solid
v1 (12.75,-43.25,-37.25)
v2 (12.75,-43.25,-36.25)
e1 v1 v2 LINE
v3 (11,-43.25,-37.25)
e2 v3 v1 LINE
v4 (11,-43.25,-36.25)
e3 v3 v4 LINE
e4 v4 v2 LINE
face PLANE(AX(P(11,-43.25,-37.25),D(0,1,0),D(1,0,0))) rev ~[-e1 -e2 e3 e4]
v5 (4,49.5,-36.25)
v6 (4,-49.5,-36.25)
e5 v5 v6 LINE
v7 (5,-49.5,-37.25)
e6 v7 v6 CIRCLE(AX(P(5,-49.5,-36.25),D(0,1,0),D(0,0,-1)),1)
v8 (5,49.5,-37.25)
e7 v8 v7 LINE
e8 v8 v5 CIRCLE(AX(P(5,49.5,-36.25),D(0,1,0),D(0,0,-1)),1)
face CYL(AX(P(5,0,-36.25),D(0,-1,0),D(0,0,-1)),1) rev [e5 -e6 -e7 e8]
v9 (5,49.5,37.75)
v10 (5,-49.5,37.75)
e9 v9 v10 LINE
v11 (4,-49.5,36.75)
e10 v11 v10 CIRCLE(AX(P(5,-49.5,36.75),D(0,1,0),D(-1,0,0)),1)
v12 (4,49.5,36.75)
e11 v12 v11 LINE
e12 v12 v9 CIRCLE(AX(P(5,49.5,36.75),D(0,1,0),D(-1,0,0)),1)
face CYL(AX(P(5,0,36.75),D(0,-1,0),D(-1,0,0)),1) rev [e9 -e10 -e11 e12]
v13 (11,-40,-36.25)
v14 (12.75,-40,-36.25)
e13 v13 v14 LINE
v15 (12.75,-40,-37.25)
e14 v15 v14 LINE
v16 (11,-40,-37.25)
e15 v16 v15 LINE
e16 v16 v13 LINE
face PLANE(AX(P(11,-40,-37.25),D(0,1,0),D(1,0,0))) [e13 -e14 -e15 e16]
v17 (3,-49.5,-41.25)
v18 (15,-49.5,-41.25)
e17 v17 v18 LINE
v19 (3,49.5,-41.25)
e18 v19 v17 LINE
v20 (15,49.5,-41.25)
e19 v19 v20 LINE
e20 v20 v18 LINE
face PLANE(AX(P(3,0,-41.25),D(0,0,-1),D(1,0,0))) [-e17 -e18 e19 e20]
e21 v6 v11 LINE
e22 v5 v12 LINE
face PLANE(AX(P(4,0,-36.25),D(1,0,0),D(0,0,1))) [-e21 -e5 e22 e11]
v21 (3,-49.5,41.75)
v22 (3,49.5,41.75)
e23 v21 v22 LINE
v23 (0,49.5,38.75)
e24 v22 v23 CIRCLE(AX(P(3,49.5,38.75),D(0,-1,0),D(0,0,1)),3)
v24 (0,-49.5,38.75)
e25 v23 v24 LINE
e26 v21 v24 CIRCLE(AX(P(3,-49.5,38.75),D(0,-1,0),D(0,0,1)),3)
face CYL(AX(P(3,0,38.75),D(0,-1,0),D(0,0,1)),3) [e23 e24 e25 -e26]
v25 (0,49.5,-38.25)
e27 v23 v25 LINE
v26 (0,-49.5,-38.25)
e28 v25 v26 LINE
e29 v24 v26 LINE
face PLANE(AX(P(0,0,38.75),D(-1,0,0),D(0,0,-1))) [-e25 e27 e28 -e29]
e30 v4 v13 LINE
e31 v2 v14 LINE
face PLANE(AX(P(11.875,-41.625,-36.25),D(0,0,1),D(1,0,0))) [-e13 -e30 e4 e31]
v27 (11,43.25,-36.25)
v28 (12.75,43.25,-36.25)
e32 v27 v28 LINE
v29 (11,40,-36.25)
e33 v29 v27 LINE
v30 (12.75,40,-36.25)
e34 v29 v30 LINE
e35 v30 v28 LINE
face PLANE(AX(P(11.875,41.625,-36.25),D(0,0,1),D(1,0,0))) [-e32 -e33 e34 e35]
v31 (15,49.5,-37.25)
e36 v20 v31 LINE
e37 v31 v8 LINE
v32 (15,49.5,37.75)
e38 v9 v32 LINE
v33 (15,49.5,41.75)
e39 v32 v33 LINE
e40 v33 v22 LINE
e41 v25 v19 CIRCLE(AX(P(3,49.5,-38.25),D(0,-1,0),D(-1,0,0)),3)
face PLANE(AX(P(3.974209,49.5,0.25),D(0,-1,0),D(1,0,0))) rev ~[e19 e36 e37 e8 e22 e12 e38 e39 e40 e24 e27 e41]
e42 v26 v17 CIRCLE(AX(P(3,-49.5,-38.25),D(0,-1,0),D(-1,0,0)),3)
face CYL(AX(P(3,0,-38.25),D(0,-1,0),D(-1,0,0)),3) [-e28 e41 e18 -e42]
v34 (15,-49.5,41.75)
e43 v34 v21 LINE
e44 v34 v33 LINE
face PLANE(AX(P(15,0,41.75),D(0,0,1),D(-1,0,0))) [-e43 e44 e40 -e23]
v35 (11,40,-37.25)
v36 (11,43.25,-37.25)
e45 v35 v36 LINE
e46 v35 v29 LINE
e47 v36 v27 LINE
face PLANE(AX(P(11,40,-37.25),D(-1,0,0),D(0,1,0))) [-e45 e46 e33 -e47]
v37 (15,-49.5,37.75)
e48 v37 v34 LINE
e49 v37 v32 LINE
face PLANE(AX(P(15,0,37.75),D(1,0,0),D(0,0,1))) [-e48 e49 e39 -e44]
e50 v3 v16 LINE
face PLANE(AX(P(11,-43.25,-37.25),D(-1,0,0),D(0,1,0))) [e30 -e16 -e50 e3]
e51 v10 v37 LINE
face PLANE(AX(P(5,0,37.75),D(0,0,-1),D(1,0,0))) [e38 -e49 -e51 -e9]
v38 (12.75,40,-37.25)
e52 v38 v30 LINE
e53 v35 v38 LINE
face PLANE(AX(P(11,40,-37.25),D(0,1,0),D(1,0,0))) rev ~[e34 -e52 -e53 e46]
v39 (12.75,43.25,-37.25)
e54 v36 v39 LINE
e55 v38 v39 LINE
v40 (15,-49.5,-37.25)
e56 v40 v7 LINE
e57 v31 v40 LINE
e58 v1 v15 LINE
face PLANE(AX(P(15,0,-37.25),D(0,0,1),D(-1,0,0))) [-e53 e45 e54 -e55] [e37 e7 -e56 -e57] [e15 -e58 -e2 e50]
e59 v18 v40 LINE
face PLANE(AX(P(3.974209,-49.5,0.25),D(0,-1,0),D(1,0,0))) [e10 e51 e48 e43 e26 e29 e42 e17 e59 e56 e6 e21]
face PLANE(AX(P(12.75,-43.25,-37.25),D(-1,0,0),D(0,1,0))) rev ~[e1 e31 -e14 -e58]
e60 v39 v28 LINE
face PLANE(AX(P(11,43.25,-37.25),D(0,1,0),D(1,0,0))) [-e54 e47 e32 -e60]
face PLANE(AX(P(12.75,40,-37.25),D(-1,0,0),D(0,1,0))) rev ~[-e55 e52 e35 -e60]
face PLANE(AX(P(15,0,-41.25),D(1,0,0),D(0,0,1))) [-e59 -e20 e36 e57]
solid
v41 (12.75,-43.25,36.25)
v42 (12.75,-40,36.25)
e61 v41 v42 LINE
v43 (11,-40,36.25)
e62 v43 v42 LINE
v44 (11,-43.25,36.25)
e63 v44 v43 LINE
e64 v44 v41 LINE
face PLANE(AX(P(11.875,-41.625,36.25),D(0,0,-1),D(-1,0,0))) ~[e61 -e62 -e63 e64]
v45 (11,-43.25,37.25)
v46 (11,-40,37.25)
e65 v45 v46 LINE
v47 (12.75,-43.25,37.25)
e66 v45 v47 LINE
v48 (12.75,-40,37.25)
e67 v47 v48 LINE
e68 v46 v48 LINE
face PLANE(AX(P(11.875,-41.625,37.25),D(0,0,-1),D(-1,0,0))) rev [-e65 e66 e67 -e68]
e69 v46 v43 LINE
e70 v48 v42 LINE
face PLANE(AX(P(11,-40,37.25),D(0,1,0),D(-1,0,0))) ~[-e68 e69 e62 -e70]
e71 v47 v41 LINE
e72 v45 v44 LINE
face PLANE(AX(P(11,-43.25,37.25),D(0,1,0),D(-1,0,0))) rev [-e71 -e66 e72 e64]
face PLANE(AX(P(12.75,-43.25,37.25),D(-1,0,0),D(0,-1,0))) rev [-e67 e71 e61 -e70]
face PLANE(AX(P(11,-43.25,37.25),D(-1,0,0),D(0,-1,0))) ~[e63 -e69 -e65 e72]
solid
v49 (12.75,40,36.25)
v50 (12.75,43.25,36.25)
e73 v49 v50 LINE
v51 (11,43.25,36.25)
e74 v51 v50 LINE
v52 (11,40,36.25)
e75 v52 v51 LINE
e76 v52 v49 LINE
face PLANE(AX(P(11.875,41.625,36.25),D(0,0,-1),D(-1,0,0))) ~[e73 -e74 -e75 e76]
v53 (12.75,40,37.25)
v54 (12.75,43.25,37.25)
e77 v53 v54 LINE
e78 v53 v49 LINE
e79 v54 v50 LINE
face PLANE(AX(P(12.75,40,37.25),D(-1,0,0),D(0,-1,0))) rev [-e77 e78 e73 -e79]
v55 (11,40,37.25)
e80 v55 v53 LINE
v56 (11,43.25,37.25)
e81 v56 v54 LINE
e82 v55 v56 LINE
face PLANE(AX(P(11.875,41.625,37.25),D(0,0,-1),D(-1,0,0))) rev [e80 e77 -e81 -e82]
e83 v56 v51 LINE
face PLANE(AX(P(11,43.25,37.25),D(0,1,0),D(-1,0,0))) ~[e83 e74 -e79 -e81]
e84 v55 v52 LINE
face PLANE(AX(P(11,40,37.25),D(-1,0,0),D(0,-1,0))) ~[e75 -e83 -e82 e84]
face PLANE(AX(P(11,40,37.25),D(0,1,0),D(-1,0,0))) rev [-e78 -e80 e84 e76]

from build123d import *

# Parameters (mm, degrees)
F1_DEPTH      = 49.5
F1_DEPTH_BACK = 49.5
F2_W          = 1.75
F2_H          = 3.25
F3_DEPTH      = 1


# Not quite as in the source:
# - a pattern or mirror of a feature is missing from the dataset's text; its kind, count and spacing are read off the source's solid


with BuildPart() as f1:
    # F0 (on Front) → F1 (new body, two sides)
    with BuildSketch(Plane.XZ) as f1_sk:
        with BuildLine():
            ThreePointArc((3, 41.75), (0.8786796564, 40.8713203436), (0, 38.75))
            Line((0, 38.75), (0, -38.25))
            ThreePointArc((0, -38.25), (0.8786796564, -40.3713203436), (3, -41.25))
            Line((3, -41.25), (15, -41.25))
            Line((15, -41.25), (15, -37.25))
            Line((15, -37.25), (5, -37.25))
            ThreePointArc((5, -37.25), (4.2928932188, -36.9571067812), (4, -36.25))
            Line((4, -36.25), (4, 36.75))
            ThreePointArc((4, 36.75), (4.2928932188, 37.4571067812), (5, 37.75))
            Line((5, 37.75), (15, 37.75))
            Line((15, 37.75), (15, 41.75))
            Line((15, 41.75), (3, 41.75))
        make_face()
    extrude(amount=F1_DEPTH)
    extrude(f1_sk.sketch, amount=-F1_DEPTH_BACK)

    # F2 (on face) → F3 (join)
    with BuildSketch(Plane.XY.offset(-37.25)):
        with Locations((11.875, 41.625)):
            Rectangle(F2_W, F2_H)
        with Locations((11.875, -41.625)):
            Rectangle(F2_W, F2_H)
    f3 = extrude(amount=F3_DEPTH)

    # F3_copies: F3 across plane
    add(f3.mirror(Plane.XY))


solid = f1.part
